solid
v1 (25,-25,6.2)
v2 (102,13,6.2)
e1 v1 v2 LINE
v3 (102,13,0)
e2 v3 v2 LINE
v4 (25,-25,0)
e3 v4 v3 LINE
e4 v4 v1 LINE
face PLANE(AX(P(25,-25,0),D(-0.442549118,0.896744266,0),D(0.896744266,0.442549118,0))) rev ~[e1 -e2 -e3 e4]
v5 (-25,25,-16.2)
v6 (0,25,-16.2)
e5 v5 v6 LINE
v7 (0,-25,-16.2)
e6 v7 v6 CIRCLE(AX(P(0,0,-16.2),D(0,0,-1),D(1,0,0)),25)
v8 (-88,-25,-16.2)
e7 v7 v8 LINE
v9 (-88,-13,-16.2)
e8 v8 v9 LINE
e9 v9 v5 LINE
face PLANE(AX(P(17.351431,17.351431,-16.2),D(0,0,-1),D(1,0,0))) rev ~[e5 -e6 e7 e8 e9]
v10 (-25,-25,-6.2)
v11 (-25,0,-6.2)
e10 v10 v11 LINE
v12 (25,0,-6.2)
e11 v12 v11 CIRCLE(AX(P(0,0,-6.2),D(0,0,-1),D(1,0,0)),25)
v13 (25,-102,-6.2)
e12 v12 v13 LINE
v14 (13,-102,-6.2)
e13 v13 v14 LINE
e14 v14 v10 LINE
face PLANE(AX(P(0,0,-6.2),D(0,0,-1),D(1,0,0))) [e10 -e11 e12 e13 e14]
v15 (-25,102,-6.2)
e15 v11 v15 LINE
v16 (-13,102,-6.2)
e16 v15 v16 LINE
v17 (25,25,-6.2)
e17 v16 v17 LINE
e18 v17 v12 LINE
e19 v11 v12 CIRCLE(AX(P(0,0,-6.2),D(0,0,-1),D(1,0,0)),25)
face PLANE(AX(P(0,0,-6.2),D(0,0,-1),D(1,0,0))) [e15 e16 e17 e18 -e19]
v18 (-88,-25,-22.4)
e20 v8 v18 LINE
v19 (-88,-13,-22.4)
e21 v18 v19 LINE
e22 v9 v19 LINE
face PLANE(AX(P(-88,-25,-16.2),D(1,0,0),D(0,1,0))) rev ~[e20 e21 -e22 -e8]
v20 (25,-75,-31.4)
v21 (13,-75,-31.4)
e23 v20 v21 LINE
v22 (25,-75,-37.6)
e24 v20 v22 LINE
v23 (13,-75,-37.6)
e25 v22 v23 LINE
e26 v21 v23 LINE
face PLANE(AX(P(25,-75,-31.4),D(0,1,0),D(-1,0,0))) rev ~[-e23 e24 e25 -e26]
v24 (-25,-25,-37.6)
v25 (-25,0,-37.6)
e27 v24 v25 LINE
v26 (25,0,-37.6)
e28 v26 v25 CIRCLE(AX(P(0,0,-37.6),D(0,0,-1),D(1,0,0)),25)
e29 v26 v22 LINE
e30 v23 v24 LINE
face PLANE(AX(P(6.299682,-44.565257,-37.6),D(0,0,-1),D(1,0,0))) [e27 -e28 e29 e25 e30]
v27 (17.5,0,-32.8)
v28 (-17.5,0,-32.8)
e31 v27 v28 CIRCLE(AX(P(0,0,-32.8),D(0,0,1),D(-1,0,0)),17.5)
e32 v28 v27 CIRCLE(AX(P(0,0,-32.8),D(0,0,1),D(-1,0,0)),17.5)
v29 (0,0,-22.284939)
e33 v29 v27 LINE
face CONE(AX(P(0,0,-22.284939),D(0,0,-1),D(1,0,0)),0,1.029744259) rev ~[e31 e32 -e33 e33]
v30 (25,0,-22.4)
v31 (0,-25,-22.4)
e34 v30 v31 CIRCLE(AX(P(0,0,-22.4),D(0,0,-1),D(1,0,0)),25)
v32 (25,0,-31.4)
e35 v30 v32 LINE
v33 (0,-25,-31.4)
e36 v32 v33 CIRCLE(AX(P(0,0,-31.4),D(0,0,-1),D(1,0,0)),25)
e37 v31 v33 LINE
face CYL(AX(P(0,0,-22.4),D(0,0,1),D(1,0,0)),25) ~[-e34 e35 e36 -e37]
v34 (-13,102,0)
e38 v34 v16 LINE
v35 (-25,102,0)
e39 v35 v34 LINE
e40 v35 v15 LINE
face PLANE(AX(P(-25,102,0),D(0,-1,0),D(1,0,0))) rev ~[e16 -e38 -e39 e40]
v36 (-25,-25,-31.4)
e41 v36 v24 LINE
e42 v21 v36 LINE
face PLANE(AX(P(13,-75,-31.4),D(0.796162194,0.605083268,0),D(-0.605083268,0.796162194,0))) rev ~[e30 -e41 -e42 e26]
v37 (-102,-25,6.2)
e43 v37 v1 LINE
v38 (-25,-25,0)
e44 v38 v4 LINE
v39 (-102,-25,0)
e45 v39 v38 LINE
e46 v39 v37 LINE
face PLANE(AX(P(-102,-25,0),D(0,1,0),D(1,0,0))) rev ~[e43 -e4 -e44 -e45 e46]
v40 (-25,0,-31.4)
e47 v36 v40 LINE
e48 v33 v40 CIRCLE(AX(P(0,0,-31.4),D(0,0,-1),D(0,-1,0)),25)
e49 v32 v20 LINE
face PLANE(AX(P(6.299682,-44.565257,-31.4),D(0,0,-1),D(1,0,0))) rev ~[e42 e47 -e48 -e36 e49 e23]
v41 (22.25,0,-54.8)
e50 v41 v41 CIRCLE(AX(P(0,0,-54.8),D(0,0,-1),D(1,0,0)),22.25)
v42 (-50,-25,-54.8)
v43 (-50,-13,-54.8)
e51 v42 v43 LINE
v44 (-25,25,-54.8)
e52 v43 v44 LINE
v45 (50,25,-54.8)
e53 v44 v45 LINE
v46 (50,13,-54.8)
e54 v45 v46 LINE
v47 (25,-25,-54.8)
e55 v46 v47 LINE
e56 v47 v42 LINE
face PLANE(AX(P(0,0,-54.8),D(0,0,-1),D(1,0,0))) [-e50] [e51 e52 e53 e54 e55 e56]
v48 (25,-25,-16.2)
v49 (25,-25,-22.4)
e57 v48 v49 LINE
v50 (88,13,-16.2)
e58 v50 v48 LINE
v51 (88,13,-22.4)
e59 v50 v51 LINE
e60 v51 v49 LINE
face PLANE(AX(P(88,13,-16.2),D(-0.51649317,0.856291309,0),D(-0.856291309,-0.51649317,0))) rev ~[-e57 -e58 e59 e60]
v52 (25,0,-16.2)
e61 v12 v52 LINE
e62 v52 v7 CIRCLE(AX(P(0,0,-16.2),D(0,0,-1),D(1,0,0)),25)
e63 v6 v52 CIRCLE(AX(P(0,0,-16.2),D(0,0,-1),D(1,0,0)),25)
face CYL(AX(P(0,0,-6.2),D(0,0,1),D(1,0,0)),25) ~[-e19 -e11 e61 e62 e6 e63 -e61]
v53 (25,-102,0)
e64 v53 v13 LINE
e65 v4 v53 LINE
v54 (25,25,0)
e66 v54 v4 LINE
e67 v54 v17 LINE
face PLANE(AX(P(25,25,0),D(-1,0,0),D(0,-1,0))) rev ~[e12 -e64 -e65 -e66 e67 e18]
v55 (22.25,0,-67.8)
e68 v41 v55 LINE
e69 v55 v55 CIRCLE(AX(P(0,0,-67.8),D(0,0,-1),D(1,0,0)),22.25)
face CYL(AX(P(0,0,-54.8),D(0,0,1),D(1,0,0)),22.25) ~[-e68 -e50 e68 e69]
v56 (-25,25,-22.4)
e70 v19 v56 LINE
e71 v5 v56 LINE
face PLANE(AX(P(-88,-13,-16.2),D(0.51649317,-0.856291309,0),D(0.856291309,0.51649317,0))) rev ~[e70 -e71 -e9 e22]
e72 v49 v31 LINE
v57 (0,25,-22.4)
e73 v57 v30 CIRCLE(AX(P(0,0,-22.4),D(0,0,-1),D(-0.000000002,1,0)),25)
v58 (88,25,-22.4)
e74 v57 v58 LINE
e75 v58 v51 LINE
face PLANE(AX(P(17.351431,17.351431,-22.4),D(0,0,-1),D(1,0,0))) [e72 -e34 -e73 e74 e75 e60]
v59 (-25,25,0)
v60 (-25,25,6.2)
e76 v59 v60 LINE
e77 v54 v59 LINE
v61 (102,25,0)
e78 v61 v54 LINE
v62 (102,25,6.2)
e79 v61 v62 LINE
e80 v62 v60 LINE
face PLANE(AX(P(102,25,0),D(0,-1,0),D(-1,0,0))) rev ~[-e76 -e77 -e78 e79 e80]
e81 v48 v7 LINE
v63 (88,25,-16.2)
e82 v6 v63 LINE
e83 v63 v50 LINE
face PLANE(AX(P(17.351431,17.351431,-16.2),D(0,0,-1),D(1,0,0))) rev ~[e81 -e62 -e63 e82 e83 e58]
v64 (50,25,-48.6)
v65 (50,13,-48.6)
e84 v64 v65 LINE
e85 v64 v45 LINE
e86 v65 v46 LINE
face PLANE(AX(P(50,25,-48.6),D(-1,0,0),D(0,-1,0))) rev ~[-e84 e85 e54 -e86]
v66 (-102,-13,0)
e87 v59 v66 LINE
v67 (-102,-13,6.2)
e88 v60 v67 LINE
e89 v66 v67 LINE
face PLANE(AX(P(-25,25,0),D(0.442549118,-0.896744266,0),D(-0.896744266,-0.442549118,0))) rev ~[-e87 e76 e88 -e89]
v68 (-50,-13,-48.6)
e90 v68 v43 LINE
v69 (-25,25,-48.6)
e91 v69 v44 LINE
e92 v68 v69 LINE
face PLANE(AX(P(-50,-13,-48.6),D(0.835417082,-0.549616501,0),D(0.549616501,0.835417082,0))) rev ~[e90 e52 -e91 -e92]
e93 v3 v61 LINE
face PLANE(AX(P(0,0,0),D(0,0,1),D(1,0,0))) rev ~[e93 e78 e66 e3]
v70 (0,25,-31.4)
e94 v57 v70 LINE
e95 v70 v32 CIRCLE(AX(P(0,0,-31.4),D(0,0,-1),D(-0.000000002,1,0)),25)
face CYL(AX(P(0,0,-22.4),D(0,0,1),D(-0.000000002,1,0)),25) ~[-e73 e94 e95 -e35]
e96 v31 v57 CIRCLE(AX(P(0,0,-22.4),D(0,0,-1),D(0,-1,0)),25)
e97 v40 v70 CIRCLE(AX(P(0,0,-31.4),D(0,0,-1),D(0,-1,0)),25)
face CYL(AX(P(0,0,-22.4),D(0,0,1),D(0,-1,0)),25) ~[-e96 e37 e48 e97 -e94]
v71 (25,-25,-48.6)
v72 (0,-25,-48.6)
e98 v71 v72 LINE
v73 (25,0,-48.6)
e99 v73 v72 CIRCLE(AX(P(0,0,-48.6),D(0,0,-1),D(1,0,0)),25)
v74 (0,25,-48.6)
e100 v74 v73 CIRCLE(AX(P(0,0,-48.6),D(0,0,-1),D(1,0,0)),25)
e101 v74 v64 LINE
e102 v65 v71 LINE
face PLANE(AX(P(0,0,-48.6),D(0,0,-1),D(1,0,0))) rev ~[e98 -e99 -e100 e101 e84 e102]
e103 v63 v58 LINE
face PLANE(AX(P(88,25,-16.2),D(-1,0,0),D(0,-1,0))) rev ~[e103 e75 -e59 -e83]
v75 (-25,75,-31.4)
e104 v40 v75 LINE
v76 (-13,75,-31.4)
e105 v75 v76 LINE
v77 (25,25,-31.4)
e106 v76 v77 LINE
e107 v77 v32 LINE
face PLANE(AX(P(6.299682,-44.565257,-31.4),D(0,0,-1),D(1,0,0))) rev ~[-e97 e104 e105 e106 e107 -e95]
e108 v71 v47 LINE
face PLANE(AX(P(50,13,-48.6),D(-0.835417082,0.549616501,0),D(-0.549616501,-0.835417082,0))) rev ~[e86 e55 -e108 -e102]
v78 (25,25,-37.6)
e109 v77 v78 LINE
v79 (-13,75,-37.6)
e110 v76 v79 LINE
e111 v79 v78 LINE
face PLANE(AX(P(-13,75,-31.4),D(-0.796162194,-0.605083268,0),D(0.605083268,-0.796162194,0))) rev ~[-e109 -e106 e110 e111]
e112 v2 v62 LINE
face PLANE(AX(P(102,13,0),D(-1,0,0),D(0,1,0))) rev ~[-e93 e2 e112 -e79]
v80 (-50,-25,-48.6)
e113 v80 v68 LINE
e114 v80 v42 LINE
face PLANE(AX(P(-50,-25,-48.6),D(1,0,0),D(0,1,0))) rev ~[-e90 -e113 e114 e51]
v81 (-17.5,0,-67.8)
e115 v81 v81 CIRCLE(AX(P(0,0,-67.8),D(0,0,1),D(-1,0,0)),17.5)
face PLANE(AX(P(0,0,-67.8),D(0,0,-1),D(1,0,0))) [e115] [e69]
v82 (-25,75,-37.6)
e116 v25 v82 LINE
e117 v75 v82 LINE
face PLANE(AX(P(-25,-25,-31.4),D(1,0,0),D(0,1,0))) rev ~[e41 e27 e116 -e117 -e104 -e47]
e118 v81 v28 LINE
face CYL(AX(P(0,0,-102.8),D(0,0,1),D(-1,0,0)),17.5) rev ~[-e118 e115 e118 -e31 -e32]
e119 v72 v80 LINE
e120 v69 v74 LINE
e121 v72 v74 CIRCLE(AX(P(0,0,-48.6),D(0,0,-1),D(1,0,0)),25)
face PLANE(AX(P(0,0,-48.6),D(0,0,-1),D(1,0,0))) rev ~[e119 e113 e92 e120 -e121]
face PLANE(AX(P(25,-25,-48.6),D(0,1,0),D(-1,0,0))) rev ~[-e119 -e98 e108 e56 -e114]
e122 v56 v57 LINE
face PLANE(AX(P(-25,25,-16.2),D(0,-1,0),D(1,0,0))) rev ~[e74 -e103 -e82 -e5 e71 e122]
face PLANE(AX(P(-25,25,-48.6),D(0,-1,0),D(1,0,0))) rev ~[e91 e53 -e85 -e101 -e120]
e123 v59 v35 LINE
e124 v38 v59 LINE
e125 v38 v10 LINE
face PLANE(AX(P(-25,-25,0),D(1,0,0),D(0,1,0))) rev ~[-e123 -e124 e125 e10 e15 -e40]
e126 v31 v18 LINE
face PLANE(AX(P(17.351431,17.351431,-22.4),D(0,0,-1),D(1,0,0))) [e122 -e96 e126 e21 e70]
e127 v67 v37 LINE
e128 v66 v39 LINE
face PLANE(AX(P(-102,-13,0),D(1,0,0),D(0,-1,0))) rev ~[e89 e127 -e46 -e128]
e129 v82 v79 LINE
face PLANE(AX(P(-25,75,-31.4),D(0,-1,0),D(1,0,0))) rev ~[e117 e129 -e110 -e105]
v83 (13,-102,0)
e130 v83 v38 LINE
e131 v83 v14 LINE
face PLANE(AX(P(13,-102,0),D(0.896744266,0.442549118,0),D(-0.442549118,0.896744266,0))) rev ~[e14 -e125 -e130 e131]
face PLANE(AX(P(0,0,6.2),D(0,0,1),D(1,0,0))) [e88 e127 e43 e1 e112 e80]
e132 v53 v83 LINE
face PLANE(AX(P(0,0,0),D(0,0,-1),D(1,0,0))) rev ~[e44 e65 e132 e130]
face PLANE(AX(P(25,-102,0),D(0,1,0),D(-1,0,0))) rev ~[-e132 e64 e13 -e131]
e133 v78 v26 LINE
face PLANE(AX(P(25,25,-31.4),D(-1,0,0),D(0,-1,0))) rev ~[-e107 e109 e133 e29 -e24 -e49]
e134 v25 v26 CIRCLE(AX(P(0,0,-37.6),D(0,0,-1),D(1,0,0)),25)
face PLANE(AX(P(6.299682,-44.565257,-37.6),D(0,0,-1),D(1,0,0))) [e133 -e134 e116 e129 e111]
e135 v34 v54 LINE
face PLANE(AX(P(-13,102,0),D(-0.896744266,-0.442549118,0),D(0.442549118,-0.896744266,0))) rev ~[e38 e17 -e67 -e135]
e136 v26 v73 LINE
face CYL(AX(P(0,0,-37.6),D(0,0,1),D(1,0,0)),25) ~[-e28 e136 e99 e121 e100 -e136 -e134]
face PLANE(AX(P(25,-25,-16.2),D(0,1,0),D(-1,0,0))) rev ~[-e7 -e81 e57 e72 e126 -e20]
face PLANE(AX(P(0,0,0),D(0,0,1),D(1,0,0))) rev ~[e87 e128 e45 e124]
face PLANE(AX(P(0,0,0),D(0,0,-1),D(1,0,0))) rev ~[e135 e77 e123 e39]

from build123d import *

# Parameters (mm, degrees)
F1_DEPTH  = 6.2
F3_DEPTH  = 6.2
F5_DEPTH  = 10
F7_DEPTH  = 6.2
F9_DEPTH  = 9
F11_DEPTH = 6.2
F13_DEPTH = 11
F15_DEPTH = 6.2
F16_R     = 22.25
F17_DEPTH = 13
F19_D     = 35
F19_DEPTH = 35
F19_TIP   = 10.515060833


# Not quite as in the source:
# - a feature names something its author has since deleted; it is built from what else it names


with BuildPart() as f1:
    # F0 (on Top) → F1 (new body)
    with BuildSketch(Plane.XY):
        Polygon((11.0905365064, -25), (25, -25), (102, 13), (102, 25), (11.0905365064, 25), (-11.0905365064, 25), (-25, 25), (-102, -13), (-102, -25), (-11.0905365064, -25), align=None)
    extrude(amount=F1_DEPTH)

    # F2 (on face) → F3 (join)
    with BuildSketch(Plane(origin=(0, 0, 0), x_dir=(1, 0, 0), z_dir=(0, 0, -1))):
        Polygon((-25, 25), (-25, 0), (-25, -25), (25, -25), (25, 0), (25, 25), align=None)
        Polygon((25, -25), (-25, -25), (-25, -102), (-13, -102), align=None)
        Polygon((13, 102), (-25, 25), (25, 25), (25, 102), align=None)
    extrude(amount=F3_DEPTH)

    # F4 (on face) → F5 (join)
    with BuildSketch(Plane(origin=(0, 0, -6.2), x_dir=(1, 0, 0), z_dir=(0, 0, -1))):
        with BuildLine():
            ThreePointArc((-25, 2.61e-08), (-1.3e-08, -25), (25, 0))
            ThreePointArc((25, 0), (1.3e-08, 25), (-25, 2.61e-08))
        make_face()
    extrude(amount=F5_DEPTH)

    # F6 (on face) → F7 (join)
    with BuildSketch(Plane(origin=(0, 0, -16.2), x_dir=(1, 0, 0), z_dir=(0, 0, -1))):
        with BuildLine():
            Line((-5.83e-08, -25), (25, -25))
            Line((25, -25), (25, 0))
            ThreePointArc((25, 0), (17.677669509, -17.6776695503), (-5.83e-08, -25))
        make_face()
        with BuildLine():
            Line((-25, -25), (-5.83e-08, -25))
            ThreePointArc((-5.83e-08, -25), (-17.6776695503, -17.677669509), (-25, 0))
            Line((-25, 0), (-25, -25))
        make_face()
        Polygon((25, 0), (25, -25), (88, -25), (88, -13), (25, 25), align=None)
        Polygon((-88, 13), (-25, -25), (-25, 0), (-25, 25), (-88, 25), align=None)
        with BuildLine():
            ThreePointArc((-25, 0), (-17.6776695503, -17.677669509), (-5.83e-08, -25))
            ThreePointArc((-5.83e-08, -25), (17.677669509, -17.6776695503), (25, 0))
            ThreePointArc((25, 0), (17.6776695297, 17.6776695297), (0, 25))
            ThreePointArc((0, 25), (-17.6776695297, 17.6776695297), (-25, 0))
        make_face()
        with BuildLine():
            Line((-25, 25), (-25, 0))
            ThreePointArc((-25, 0), (-17.6776695297, 17.6776695297), (0, 25))
            Line((0, 25), (-25, 25))
        make_face()
        with BuildLine():
            ThreePointArc((0, 25), (17.6776695297, 17.6776695297), (25, 0))
            Line((25, 0), (25, 25))
            Line((25, 25), (0, 25))
        make_face()
    extrude(amount=F7_DEPTH)

    # F8 (on face) → F9 (join)
    with BuildSketch(Plane(origin=(0, 0, -22.4), x_dir=(1, 0, 0), z_dir=(0, 0, -1))):
        with BuildLine():
            ThreePointArc((-5.83e-08, -25), (17.677669509, -17.6776695503), (25, 0))
            ThreePointArc((25, 0), (17.6776695297, 17.6776695297), (0, 25))
            ThreePointArc((0, 25), (-25, 2.92e-08), (-5.83e-08, -25))
        make_face()
    extrude(amount=F9_DEPTH)

    # F10 (on face) → F11 (join)
    with BuildSketch(Plane(origin=(0, 0, -31.4), x_dir=(1, 0, 0), z_dir=(0, 0, -1))):
        Polygon((13, 75), (-25, 25), (4.22e-08, 25), (25, 25), (25, 75), align=None)
        with BuildLine():
            ThreePointArc((4.22e-08, 25), (17.6776695446, 17.6776695147), (25, 0))
            Line((25, 0), (25, 25))
            Line((25, 25), (4.22e-08, 25))
        make_face()
        with BuildLine():
            ThreePointArc((-25, 0), (-17.6776695332, -17.6776695262), (-9.9e-09, -25))
            ThreePointArc((-9.9e-09, -25), (17.6776695262, -17.6776695332), (25, 0))
            ThreePointArc((25, 0), (17.6776695446, 17.6776695147), (4.22e-08, 25))
            ThreePointArc((4.22e-08, 25), (-17.6776695147, 17.6776695446), (-25, 0))
        make_face()
        with BuildLine():
            ThreePointArc((25, 0), (17.6776695262, -17.6776695332), (-9.9e-09, -25))
            Line((-9.9e-09, -25), (25, -25))
            Line((25, -25), (25, 0))
        make_face()
        Polygon((-9.9e-09, -25), (-25, -25), (-25, -75), (-13, -75), (25, -25), align=None)
        with BuildLine():
            Line((-25, 0), (-25, -25))
            Line((-25, -25), (-9.9e-09, -25))
            ThreePointArc((-9.9e-09, -25), (-17.6776695332, -17.6776695262), (-25, 0))
        make_face()
        with BuildLine():
            Line((-25, 25), (-25, 0))
            ThreePointArc((-25, 0), (-17.6776695147, 17.6776695446), (4.22e-08, 25))
            Line((4.22e-08, 25), (-25, 25))
        make_face()
    extrude(amount=F11_DEPTH)

    # F12 (on face) → F13 (join)
    with BuildSketch(Plane(origin=(0, 0, -37.6), x_dir=(1, 0, 0), z_dir=(0, 0, -1))):
        with BuildLine():
            ThreePointArc((-25, 2.61e-08), (-1.3e-08, -25), (25, 0))
            ThreePointArc((25, 0), (1.3e-08, 25), (-25, 2.61e-08))
        make_face()
    extrude(amount=F13_DEPTH)

    # F14 (on face) → F15 (join)
    with BuildSketch(Plane(origin=(0, 0, -48.6), x_dir=(1, 0, 0), z_dir=(0, 0, -1))):
        with BuildLine():
            ThreePointArc((-25, 0), (-17.6776695204, -17.6776695389), (2.61e-08, -25))
            ThreePointArc((2.61e-08, -25), (17.6776695389, -17.6776695204), (25, 0))
            ThreePointArc((25, 0), (17.6776695389, 17.6776695204), (2.61e-08, 25))
            ThreePointArc((2.61e-08, 25), (-17.6776695204, 17.6776695389), (-25, 0))
        make_face()
        with BuildLine():
            ThreePointArc((2.61e-08, 25), (17.6776695389, 17.6776695204), (25, 0))
            Line((25, 0), (25, 25))
            Line((25, 25), (2.61e-08, 25))
        make_face()
        with BuildLine():
            Line((2.61e-08, -25), (25, -25))
            Line((25, -25), (25, 0))
            ThreePointArc((25, 0), (17.6776695389, -17.6776695204), (2.61e-08, -25))
        make_face()
        with BuildLine():
            Line((-25, -25), (2.61e-08, -25))
            ThreePointArc((2.61e-08, -25), (-17.6776695204, -17.6776695389), (-25, 0))
            Line((-25, 0), (-25, -25))
        make_face()
        with BuildLine():
            Line((-25, 25), (-25, 0))
            ThreePointArc((-25, 0), (-17.6776695204, 17.6776695389), (2.61e-08, 25))
            Line((2.61e-08, 25), (-25, 25))
        make_face()
        Polygon((-50, 13), (-25, -25), (-25, 0), (-25, 25), (-50, 25), align=None)
        Polygon((25, 0), (25, -25), (50, -25), (50, -13), (25, 25), align=None)
    extrude(amount=F15_DEPTH)

    # F16 (on face) → F17 (join)
    with BuildSketch(Plane(origin=(0, 0, -54.8), x_dir=(1, 0, 0), z_dir=(0, 0, -1))):
        Circle(F16_R)
    extrude(amount=F17_DEPTH)

    # F19
    with Locations(Plane(origin=(0, 0, -67.8), x_dir=(1, 0, 0), z_dir=(0, 0, -1))):
        with Locations((0, 0)):
            Hole(F19_D / 2, depth=F19_DEPTH)
            with Locations((0, 0, -(F19_DEPTH + F19_TIP / 2))):  # 118° drill point
                Cone(0, F19_D / 2, F19_TIP, mode=Mode.SUBTRACT)


solid = f1.part
